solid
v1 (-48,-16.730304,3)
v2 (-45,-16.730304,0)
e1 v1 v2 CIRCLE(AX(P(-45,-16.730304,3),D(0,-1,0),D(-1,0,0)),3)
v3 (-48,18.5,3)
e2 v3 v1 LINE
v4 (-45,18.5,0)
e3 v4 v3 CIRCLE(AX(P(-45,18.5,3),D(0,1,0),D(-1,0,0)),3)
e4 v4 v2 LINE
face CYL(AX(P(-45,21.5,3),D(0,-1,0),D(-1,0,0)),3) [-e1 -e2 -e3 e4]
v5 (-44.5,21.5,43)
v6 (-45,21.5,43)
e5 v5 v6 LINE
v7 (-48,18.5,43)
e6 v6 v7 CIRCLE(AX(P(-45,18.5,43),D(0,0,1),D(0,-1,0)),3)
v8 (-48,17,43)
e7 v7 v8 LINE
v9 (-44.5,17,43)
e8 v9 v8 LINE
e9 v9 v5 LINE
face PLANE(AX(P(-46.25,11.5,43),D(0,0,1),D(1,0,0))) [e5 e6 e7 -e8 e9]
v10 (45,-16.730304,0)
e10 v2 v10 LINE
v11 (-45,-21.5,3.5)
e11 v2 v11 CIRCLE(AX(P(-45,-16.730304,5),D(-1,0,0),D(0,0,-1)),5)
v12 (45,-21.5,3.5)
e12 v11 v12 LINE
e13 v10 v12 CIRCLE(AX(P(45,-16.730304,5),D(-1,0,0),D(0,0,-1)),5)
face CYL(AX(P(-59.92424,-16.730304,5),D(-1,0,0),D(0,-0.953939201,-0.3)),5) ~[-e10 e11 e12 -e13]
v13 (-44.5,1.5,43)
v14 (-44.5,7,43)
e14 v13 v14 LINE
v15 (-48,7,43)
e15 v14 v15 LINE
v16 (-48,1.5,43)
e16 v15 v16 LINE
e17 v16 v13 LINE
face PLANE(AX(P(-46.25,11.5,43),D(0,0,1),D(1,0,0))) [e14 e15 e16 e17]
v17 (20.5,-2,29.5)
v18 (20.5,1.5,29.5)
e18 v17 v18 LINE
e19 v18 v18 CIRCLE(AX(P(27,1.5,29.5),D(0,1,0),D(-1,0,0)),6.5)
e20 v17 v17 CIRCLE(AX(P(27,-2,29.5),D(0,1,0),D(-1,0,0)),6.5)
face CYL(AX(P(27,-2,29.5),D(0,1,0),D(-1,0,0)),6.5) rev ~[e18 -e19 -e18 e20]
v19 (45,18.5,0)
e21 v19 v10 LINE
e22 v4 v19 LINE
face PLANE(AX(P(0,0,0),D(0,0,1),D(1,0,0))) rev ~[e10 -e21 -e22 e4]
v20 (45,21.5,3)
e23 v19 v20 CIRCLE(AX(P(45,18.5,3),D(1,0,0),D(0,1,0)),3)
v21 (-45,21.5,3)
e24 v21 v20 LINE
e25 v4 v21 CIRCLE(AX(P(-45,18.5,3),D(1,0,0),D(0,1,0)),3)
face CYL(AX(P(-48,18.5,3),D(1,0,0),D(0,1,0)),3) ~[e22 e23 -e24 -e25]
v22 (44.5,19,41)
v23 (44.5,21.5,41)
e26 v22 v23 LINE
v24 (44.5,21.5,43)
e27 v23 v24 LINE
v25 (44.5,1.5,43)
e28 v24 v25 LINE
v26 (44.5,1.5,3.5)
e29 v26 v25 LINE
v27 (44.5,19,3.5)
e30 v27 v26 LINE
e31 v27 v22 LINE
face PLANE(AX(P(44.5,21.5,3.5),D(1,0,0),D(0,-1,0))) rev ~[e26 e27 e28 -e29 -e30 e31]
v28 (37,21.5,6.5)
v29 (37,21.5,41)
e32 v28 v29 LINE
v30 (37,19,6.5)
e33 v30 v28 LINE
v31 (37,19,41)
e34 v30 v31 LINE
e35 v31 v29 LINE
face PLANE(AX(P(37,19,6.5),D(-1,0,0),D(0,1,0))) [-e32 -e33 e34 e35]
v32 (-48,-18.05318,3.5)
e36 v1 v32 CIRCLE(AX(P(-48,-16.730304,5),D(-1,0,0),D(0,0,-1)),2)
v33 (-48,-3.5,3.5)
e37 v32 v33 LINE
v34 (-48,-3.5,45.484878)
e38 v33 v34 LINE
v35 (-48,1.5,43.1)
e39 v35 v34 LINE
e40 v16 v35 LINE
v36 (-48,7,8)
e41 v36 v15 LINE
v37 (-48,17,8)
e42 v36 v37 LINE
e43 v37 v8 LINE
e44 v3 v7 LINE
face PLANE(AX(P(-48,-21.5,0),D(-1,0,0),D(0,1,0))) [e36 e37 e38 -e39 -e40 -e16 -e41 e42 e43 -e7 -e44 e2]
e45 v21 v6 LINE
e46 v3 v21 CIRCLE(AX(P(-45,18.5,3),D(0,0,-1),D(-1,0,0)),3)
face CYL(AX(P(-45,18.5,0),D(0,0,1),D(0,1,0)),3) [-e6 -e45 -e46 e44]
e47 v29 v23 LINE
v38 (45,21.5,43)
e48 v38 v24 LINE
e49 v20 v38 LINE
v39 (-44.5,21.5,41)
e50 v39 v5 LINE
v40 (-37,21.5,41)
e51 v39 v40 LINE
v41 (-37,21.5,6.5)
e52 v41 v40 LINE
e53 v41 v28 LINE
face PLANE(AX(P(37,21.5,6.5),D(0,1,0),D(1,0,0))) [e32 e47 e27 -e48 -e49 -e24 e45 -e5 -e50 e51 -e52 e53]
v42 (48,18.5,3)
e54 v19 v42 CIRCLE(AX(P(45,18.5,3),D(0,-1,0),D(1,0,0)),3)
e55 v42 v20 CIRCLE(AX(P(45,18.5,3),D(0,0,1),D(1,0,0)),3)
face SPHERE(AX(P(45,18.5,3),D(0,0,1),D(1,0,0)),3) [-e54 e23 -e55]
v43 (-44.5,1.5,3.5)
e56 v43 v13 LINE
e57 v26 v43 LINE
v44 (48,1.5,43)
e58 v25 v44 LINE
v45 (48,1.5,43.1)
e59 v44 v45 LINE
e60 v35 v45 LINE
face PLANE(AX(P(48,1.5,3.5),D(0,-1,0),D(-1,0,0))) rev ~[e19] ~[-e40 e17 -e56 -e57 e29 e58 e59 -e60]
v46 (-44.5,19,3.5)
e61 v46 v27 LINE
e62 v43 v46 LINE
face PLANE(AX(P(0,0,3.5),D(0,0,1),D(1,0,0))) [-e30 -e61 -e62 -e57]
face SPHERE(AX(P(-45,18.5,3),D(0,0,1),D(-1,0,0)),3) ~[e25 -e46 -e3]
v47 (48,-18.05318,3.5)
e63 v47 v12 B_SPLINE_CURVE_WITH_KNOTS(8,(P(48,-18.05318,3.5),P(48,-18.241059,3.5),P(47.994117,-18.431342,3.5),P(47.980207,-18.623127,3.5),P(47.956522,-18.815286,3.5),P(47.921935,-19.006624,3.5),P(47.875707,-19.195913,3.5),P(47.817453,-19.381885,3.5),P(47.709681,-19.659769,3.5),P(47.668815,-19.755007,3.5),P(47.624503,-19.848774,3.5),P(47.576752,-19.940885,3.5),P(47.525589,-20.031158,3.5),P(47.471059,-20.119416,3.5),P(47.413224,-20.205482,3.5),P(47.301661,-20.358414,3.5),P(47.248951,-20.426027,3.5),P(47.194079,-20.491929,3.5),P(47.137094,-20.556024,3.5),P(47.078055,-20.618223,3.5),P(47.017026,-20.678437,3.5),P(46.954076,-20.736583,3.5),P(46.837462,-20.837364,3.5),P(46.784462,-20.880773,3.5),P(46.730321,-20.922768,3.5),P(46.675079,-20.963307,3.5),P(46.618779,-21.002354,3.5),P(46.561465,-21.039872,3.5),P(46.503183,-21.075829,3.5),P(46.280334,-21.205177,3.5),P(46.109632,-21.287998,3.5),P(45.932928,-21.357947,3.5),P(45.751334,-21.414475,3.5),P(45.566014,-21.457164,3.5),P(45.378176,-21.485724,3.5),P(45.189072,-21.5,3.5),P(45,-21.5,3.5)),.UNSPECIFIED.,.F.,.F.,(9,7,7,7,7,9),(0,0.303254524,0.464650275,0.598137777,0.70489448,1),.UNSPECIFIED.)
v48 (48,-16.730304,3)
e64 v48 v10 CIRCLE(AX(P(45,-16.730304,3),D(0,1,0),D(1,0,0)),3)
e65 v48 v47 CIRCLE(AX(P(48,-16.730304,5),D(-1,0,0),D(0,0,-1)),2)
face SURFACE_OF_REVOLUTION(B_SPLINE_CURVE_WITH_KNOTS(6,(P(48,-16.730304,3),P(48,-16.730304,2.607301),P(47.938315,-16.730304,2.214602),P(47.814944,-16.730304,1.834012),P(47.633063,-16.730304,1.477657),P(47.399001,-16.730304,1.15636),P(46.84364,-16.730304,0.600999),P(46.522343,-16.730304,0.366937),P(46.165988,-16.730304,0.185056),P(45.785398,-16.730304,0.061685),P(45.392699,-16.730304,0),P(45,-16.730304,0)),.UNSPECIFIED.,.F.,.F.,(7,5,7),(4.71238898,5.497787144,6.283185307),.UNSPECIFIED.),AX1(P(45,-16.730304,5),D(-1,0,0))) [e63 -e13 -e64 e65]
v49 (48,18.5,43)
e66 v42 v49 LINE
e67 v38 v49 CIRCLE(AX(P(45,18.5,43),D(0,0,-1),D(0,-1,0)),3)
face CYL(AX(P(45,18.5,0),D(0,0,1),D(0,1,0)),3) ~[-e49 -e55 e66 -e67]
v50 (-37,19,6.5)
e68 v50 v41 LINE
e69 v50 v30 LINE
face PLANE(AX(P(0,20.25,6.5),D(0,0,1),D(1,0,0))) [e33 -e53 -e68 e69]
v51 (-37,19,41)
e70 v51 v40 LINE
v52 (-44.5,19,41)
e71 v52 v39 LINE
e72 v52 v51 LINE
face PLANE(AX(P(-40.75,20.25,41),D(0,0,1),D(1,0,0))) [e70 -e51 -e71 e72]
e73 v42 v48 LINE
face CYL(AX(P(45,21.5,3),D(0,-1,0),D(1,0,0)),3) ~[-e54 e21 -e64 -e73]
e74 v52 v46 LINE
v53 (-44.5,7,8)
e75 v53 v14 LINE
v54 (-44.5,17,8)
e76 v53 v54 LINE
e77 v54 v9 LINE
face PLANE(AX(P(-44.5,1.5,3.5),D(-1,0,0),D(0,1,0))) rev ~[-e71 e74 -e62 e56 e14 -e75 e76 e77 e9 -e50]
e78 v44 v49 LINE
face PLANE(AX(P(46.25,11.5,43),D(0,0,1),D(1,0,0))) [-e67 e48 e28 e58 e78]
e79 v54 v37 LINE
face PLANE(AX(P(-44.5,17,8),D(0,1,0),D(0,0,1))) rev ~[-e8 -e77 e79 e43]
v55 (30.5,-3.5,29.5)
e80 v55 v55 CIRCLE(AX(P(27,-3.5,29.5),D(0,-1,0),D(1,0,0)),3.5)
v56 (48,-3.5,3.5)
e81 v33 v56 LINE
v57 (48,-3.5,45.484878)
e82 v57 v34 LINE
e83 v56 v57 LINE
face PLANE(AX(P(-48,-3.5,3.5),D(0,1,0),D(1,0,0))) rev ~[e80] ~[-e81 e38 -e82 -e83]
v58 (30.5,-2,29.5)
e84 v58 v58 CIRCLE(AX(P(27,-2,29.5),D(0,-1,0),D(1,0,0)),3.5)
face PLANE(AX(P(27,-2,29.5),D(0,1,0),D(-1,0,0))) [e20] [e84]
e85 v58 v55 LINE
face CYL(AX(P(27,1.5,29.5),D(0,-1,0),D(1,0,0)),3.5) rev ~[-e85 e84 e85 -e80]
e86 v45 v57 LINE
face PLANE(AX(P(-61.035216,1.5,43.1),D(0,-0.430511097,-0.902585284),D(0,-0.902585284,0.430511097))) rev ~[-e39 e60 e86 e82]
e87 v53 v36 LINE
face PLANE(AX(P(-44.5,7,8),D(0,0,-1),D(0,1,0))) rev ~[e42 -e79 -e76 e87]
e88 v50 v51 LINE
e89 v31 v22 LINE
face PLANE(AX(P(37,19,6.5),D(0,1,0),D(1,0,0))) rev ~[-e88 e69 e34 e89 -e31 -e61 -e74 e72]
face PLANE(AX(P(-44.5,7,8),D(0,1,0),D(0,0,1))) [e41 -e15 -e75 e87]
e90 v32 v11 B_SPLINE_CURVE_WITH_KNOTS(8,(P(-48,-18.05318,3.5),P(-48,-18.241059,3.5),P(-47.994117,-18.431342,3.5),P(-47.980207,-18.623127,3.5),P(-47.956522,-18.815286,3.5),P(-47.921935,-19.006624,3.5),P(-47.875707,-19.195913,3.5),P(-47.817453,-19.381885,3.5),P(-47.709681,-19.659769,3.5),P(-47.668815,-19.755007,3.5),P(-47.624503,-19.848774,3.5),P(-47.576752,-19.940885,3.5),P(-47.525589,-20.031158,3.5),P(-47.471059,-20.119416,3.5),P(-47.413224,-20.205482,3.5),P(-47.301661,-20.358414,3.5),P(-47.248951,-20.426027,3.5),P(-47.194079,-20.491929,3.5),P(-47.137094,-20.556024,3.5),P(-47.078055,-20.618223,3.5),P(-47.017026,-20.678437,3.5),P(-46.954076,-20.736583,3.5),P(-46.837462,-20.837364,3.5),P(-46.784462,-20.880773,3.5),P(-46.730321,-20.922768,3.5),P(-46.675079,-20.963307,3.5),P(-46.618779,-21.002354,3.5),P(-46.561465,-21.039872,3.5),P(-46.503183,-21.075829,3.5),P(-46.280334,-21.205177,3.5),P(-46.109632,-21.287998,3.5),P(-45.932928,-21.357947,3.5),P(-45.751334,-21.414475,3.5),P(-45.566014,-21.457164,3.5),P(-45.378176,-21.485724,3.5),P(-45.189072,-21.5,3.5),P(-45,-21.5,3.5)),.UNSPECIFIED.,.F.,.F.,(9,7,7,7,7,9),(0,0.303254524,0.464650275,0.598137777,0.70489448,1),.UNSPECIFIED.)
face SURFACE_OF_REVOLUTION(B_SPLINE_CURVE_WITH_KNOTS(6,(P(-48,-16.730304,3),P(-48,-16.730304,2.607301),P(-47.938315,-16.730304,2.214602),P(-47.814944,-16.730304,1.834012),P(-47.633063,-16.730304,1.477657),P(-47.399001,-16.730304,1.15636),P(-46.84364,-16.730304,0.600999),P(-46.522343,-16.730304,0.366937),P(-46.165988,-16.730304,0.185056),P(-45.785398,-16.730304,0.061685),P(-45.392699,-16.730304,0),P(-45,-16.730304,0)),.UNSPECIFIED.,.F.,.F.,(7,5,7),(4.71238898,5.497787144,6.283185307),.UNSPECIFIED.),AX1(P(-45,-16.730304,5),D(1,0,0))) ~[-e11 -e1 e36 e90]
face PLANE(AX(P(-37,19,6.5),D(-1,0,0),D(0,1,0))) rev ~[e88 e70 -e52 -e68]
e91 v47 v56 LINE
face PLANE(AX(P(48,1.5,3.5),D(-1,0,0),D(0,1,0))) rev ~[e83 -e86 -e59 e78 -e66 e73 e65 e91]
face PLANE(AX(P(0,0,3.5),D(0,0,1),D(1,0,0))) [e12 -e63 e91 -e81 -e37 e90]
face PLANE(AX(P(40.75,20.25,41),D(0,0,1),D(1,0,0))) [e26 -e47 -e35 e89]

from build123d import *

# Parameters (mm, degrees)
F0_W           = 96
F0_H           = 43
F1_DEPTH       = 3.5
F2_T1_DEPTH    = 119.8484800354
F4_DEPTH       = 42
F5_T1_DEPTH    = 122.0704317696
F7_D           = 7
F7_CBORE_D     = 13
F7_CBORE_DEPTH = 3.5
F8_DEPTH       = 39.5
F3_W           = 89
F3_H           = 2.5
F9_DEPTH       = 3
F10_W          = 7.5
F10_H          = 2.5
F11_DEPTH      = 34.5
F12_W          = 10
F12_H          = 35
F13_DEPTH      = 3.5
F14_R          = 3


# Not quite as in the source:
# - a fillet or chamfer that OpenCascade refuses, or shapes differently, is made with other operations: its cross-section is extruded or revolved along the edge and cut away or added


with BuildPart() as f1:
    # F0 (on Top) → F1 (new body)
    with BuildSketch(Plane.XY):
        Rectangle(F0_W, F0_H)
    extrude(amount=F1_DEPTH)

    # F2: fillet of radius 5 on 1 edges, made by hand

    # F2_s2 → F2_t1 (cut)
    with BuildSketch(Plane.YZ.offset(-59.9242400177)):
        with BuildLine():
            ThreePointArc((-21.5, 3.5), (-19.6883438845, 0.9688711259), (-16.7303039929, 0))
            Line((-16.7303039929, 0), (-21.5, 0))
            Line((-21.5, 0), (-21.5, 3.5))
        make_face()
    extrude(amount=F2_T1_DEPTH, mode=Mode.SUBTRACT)

    # F3 (on face) → F4 (join)
    with BuildSketch(Plane.XY.offset(3.5)):
        Polygon((-48, 1.5), (-48, -3.5), (48, -3.5), (48, 1.5), (44.5, 1.5), (-44.5, 1.5), align=None)
    extrude(amount=F4_DEPTH)

    # F5: chamfer of 2.4 x 5.0317046378 on 1 edges, made by hand

    # F5_s2 → F5_t1 (cut)
    with BuildSketch(Plane.YZ.offset(-61.0352158848)):
        Polygon((1.5, 43.1), (-3.5317046378, 45.5), (1.5, 45.5), align=None)
    extrude(amount=F5_T1_DEPTH, mode=Mode.SUBTRACT)

    # F7 (through all)
    with Locations(Plane(origin=(0, 1.5, 0), x_dir=(-1, 0, 0), z_dir=(0, 1, 0))):
        with Locations((-27, 29.5)):
            CounterBoreHole(F7_D / 2, F7_CBORE_D / 2, F7_CBORE_DEPTH)

    # F3 (on face) → F8 (join)
    with BuildSketch(Plane.XY.offset(3.5)):
        Polygon((44.5, 1.5), (48, 1.5), (48, 21.5), (44.5, 21.5), (44.5, 19), align=None)
        Polygon((-48, 21.5), (-48, 1.5), (-44.5, 1.5), (-44.5, 19), (-44.5, 21.5), align=None)
    extrude(amount=F8_DEPTH)

    # F3 (on face) → F9 (join)
    with BuildSketch(Plane.XY.offset(3.5)):
        with Locations((0, 20.25)):
            Rectangle(F3_W, F3_H)
    extrude(amount=F9_DEPTH)

    # F10 (on face) → F11 (join)
    with BuildSketch(Plane.XY.offset(6.5)):
        with Locations((40.75, 20.25)):
            Rectangle(F10_W, F10_H)
        with Locations((-40.75, 20.25)):
            Rectangle(F10_W, F10_H)
    extrude(amount=F11_DEPTH)

    # F12 (on face) → F13 (cut)
    with BuildSketch(Plane.YZ.offset(-44.5)):
        with Locations((12, 25.5)):
            Rectangle(F12_W, F12_H)
    extrude(amount=-F13_DEPTH, mode=Mode.SUBTRACT)

    # F14
    f14_edges = [f1.edges().sort_by_distance(p)[0] for p in [
        (-48, 21.5, 21.5),
        (48, 21.5, 21.5),
        (-48, -19.688344, 0.968871),
        (48, -19.688344, 0.968871),
        (0, 21.5, 0),
        (48, 2.384848, 0),
        (-48, 2.384848, 0),
    ]]
    fillet(f14_edges, radius=F14_R)


solid = f1.part
